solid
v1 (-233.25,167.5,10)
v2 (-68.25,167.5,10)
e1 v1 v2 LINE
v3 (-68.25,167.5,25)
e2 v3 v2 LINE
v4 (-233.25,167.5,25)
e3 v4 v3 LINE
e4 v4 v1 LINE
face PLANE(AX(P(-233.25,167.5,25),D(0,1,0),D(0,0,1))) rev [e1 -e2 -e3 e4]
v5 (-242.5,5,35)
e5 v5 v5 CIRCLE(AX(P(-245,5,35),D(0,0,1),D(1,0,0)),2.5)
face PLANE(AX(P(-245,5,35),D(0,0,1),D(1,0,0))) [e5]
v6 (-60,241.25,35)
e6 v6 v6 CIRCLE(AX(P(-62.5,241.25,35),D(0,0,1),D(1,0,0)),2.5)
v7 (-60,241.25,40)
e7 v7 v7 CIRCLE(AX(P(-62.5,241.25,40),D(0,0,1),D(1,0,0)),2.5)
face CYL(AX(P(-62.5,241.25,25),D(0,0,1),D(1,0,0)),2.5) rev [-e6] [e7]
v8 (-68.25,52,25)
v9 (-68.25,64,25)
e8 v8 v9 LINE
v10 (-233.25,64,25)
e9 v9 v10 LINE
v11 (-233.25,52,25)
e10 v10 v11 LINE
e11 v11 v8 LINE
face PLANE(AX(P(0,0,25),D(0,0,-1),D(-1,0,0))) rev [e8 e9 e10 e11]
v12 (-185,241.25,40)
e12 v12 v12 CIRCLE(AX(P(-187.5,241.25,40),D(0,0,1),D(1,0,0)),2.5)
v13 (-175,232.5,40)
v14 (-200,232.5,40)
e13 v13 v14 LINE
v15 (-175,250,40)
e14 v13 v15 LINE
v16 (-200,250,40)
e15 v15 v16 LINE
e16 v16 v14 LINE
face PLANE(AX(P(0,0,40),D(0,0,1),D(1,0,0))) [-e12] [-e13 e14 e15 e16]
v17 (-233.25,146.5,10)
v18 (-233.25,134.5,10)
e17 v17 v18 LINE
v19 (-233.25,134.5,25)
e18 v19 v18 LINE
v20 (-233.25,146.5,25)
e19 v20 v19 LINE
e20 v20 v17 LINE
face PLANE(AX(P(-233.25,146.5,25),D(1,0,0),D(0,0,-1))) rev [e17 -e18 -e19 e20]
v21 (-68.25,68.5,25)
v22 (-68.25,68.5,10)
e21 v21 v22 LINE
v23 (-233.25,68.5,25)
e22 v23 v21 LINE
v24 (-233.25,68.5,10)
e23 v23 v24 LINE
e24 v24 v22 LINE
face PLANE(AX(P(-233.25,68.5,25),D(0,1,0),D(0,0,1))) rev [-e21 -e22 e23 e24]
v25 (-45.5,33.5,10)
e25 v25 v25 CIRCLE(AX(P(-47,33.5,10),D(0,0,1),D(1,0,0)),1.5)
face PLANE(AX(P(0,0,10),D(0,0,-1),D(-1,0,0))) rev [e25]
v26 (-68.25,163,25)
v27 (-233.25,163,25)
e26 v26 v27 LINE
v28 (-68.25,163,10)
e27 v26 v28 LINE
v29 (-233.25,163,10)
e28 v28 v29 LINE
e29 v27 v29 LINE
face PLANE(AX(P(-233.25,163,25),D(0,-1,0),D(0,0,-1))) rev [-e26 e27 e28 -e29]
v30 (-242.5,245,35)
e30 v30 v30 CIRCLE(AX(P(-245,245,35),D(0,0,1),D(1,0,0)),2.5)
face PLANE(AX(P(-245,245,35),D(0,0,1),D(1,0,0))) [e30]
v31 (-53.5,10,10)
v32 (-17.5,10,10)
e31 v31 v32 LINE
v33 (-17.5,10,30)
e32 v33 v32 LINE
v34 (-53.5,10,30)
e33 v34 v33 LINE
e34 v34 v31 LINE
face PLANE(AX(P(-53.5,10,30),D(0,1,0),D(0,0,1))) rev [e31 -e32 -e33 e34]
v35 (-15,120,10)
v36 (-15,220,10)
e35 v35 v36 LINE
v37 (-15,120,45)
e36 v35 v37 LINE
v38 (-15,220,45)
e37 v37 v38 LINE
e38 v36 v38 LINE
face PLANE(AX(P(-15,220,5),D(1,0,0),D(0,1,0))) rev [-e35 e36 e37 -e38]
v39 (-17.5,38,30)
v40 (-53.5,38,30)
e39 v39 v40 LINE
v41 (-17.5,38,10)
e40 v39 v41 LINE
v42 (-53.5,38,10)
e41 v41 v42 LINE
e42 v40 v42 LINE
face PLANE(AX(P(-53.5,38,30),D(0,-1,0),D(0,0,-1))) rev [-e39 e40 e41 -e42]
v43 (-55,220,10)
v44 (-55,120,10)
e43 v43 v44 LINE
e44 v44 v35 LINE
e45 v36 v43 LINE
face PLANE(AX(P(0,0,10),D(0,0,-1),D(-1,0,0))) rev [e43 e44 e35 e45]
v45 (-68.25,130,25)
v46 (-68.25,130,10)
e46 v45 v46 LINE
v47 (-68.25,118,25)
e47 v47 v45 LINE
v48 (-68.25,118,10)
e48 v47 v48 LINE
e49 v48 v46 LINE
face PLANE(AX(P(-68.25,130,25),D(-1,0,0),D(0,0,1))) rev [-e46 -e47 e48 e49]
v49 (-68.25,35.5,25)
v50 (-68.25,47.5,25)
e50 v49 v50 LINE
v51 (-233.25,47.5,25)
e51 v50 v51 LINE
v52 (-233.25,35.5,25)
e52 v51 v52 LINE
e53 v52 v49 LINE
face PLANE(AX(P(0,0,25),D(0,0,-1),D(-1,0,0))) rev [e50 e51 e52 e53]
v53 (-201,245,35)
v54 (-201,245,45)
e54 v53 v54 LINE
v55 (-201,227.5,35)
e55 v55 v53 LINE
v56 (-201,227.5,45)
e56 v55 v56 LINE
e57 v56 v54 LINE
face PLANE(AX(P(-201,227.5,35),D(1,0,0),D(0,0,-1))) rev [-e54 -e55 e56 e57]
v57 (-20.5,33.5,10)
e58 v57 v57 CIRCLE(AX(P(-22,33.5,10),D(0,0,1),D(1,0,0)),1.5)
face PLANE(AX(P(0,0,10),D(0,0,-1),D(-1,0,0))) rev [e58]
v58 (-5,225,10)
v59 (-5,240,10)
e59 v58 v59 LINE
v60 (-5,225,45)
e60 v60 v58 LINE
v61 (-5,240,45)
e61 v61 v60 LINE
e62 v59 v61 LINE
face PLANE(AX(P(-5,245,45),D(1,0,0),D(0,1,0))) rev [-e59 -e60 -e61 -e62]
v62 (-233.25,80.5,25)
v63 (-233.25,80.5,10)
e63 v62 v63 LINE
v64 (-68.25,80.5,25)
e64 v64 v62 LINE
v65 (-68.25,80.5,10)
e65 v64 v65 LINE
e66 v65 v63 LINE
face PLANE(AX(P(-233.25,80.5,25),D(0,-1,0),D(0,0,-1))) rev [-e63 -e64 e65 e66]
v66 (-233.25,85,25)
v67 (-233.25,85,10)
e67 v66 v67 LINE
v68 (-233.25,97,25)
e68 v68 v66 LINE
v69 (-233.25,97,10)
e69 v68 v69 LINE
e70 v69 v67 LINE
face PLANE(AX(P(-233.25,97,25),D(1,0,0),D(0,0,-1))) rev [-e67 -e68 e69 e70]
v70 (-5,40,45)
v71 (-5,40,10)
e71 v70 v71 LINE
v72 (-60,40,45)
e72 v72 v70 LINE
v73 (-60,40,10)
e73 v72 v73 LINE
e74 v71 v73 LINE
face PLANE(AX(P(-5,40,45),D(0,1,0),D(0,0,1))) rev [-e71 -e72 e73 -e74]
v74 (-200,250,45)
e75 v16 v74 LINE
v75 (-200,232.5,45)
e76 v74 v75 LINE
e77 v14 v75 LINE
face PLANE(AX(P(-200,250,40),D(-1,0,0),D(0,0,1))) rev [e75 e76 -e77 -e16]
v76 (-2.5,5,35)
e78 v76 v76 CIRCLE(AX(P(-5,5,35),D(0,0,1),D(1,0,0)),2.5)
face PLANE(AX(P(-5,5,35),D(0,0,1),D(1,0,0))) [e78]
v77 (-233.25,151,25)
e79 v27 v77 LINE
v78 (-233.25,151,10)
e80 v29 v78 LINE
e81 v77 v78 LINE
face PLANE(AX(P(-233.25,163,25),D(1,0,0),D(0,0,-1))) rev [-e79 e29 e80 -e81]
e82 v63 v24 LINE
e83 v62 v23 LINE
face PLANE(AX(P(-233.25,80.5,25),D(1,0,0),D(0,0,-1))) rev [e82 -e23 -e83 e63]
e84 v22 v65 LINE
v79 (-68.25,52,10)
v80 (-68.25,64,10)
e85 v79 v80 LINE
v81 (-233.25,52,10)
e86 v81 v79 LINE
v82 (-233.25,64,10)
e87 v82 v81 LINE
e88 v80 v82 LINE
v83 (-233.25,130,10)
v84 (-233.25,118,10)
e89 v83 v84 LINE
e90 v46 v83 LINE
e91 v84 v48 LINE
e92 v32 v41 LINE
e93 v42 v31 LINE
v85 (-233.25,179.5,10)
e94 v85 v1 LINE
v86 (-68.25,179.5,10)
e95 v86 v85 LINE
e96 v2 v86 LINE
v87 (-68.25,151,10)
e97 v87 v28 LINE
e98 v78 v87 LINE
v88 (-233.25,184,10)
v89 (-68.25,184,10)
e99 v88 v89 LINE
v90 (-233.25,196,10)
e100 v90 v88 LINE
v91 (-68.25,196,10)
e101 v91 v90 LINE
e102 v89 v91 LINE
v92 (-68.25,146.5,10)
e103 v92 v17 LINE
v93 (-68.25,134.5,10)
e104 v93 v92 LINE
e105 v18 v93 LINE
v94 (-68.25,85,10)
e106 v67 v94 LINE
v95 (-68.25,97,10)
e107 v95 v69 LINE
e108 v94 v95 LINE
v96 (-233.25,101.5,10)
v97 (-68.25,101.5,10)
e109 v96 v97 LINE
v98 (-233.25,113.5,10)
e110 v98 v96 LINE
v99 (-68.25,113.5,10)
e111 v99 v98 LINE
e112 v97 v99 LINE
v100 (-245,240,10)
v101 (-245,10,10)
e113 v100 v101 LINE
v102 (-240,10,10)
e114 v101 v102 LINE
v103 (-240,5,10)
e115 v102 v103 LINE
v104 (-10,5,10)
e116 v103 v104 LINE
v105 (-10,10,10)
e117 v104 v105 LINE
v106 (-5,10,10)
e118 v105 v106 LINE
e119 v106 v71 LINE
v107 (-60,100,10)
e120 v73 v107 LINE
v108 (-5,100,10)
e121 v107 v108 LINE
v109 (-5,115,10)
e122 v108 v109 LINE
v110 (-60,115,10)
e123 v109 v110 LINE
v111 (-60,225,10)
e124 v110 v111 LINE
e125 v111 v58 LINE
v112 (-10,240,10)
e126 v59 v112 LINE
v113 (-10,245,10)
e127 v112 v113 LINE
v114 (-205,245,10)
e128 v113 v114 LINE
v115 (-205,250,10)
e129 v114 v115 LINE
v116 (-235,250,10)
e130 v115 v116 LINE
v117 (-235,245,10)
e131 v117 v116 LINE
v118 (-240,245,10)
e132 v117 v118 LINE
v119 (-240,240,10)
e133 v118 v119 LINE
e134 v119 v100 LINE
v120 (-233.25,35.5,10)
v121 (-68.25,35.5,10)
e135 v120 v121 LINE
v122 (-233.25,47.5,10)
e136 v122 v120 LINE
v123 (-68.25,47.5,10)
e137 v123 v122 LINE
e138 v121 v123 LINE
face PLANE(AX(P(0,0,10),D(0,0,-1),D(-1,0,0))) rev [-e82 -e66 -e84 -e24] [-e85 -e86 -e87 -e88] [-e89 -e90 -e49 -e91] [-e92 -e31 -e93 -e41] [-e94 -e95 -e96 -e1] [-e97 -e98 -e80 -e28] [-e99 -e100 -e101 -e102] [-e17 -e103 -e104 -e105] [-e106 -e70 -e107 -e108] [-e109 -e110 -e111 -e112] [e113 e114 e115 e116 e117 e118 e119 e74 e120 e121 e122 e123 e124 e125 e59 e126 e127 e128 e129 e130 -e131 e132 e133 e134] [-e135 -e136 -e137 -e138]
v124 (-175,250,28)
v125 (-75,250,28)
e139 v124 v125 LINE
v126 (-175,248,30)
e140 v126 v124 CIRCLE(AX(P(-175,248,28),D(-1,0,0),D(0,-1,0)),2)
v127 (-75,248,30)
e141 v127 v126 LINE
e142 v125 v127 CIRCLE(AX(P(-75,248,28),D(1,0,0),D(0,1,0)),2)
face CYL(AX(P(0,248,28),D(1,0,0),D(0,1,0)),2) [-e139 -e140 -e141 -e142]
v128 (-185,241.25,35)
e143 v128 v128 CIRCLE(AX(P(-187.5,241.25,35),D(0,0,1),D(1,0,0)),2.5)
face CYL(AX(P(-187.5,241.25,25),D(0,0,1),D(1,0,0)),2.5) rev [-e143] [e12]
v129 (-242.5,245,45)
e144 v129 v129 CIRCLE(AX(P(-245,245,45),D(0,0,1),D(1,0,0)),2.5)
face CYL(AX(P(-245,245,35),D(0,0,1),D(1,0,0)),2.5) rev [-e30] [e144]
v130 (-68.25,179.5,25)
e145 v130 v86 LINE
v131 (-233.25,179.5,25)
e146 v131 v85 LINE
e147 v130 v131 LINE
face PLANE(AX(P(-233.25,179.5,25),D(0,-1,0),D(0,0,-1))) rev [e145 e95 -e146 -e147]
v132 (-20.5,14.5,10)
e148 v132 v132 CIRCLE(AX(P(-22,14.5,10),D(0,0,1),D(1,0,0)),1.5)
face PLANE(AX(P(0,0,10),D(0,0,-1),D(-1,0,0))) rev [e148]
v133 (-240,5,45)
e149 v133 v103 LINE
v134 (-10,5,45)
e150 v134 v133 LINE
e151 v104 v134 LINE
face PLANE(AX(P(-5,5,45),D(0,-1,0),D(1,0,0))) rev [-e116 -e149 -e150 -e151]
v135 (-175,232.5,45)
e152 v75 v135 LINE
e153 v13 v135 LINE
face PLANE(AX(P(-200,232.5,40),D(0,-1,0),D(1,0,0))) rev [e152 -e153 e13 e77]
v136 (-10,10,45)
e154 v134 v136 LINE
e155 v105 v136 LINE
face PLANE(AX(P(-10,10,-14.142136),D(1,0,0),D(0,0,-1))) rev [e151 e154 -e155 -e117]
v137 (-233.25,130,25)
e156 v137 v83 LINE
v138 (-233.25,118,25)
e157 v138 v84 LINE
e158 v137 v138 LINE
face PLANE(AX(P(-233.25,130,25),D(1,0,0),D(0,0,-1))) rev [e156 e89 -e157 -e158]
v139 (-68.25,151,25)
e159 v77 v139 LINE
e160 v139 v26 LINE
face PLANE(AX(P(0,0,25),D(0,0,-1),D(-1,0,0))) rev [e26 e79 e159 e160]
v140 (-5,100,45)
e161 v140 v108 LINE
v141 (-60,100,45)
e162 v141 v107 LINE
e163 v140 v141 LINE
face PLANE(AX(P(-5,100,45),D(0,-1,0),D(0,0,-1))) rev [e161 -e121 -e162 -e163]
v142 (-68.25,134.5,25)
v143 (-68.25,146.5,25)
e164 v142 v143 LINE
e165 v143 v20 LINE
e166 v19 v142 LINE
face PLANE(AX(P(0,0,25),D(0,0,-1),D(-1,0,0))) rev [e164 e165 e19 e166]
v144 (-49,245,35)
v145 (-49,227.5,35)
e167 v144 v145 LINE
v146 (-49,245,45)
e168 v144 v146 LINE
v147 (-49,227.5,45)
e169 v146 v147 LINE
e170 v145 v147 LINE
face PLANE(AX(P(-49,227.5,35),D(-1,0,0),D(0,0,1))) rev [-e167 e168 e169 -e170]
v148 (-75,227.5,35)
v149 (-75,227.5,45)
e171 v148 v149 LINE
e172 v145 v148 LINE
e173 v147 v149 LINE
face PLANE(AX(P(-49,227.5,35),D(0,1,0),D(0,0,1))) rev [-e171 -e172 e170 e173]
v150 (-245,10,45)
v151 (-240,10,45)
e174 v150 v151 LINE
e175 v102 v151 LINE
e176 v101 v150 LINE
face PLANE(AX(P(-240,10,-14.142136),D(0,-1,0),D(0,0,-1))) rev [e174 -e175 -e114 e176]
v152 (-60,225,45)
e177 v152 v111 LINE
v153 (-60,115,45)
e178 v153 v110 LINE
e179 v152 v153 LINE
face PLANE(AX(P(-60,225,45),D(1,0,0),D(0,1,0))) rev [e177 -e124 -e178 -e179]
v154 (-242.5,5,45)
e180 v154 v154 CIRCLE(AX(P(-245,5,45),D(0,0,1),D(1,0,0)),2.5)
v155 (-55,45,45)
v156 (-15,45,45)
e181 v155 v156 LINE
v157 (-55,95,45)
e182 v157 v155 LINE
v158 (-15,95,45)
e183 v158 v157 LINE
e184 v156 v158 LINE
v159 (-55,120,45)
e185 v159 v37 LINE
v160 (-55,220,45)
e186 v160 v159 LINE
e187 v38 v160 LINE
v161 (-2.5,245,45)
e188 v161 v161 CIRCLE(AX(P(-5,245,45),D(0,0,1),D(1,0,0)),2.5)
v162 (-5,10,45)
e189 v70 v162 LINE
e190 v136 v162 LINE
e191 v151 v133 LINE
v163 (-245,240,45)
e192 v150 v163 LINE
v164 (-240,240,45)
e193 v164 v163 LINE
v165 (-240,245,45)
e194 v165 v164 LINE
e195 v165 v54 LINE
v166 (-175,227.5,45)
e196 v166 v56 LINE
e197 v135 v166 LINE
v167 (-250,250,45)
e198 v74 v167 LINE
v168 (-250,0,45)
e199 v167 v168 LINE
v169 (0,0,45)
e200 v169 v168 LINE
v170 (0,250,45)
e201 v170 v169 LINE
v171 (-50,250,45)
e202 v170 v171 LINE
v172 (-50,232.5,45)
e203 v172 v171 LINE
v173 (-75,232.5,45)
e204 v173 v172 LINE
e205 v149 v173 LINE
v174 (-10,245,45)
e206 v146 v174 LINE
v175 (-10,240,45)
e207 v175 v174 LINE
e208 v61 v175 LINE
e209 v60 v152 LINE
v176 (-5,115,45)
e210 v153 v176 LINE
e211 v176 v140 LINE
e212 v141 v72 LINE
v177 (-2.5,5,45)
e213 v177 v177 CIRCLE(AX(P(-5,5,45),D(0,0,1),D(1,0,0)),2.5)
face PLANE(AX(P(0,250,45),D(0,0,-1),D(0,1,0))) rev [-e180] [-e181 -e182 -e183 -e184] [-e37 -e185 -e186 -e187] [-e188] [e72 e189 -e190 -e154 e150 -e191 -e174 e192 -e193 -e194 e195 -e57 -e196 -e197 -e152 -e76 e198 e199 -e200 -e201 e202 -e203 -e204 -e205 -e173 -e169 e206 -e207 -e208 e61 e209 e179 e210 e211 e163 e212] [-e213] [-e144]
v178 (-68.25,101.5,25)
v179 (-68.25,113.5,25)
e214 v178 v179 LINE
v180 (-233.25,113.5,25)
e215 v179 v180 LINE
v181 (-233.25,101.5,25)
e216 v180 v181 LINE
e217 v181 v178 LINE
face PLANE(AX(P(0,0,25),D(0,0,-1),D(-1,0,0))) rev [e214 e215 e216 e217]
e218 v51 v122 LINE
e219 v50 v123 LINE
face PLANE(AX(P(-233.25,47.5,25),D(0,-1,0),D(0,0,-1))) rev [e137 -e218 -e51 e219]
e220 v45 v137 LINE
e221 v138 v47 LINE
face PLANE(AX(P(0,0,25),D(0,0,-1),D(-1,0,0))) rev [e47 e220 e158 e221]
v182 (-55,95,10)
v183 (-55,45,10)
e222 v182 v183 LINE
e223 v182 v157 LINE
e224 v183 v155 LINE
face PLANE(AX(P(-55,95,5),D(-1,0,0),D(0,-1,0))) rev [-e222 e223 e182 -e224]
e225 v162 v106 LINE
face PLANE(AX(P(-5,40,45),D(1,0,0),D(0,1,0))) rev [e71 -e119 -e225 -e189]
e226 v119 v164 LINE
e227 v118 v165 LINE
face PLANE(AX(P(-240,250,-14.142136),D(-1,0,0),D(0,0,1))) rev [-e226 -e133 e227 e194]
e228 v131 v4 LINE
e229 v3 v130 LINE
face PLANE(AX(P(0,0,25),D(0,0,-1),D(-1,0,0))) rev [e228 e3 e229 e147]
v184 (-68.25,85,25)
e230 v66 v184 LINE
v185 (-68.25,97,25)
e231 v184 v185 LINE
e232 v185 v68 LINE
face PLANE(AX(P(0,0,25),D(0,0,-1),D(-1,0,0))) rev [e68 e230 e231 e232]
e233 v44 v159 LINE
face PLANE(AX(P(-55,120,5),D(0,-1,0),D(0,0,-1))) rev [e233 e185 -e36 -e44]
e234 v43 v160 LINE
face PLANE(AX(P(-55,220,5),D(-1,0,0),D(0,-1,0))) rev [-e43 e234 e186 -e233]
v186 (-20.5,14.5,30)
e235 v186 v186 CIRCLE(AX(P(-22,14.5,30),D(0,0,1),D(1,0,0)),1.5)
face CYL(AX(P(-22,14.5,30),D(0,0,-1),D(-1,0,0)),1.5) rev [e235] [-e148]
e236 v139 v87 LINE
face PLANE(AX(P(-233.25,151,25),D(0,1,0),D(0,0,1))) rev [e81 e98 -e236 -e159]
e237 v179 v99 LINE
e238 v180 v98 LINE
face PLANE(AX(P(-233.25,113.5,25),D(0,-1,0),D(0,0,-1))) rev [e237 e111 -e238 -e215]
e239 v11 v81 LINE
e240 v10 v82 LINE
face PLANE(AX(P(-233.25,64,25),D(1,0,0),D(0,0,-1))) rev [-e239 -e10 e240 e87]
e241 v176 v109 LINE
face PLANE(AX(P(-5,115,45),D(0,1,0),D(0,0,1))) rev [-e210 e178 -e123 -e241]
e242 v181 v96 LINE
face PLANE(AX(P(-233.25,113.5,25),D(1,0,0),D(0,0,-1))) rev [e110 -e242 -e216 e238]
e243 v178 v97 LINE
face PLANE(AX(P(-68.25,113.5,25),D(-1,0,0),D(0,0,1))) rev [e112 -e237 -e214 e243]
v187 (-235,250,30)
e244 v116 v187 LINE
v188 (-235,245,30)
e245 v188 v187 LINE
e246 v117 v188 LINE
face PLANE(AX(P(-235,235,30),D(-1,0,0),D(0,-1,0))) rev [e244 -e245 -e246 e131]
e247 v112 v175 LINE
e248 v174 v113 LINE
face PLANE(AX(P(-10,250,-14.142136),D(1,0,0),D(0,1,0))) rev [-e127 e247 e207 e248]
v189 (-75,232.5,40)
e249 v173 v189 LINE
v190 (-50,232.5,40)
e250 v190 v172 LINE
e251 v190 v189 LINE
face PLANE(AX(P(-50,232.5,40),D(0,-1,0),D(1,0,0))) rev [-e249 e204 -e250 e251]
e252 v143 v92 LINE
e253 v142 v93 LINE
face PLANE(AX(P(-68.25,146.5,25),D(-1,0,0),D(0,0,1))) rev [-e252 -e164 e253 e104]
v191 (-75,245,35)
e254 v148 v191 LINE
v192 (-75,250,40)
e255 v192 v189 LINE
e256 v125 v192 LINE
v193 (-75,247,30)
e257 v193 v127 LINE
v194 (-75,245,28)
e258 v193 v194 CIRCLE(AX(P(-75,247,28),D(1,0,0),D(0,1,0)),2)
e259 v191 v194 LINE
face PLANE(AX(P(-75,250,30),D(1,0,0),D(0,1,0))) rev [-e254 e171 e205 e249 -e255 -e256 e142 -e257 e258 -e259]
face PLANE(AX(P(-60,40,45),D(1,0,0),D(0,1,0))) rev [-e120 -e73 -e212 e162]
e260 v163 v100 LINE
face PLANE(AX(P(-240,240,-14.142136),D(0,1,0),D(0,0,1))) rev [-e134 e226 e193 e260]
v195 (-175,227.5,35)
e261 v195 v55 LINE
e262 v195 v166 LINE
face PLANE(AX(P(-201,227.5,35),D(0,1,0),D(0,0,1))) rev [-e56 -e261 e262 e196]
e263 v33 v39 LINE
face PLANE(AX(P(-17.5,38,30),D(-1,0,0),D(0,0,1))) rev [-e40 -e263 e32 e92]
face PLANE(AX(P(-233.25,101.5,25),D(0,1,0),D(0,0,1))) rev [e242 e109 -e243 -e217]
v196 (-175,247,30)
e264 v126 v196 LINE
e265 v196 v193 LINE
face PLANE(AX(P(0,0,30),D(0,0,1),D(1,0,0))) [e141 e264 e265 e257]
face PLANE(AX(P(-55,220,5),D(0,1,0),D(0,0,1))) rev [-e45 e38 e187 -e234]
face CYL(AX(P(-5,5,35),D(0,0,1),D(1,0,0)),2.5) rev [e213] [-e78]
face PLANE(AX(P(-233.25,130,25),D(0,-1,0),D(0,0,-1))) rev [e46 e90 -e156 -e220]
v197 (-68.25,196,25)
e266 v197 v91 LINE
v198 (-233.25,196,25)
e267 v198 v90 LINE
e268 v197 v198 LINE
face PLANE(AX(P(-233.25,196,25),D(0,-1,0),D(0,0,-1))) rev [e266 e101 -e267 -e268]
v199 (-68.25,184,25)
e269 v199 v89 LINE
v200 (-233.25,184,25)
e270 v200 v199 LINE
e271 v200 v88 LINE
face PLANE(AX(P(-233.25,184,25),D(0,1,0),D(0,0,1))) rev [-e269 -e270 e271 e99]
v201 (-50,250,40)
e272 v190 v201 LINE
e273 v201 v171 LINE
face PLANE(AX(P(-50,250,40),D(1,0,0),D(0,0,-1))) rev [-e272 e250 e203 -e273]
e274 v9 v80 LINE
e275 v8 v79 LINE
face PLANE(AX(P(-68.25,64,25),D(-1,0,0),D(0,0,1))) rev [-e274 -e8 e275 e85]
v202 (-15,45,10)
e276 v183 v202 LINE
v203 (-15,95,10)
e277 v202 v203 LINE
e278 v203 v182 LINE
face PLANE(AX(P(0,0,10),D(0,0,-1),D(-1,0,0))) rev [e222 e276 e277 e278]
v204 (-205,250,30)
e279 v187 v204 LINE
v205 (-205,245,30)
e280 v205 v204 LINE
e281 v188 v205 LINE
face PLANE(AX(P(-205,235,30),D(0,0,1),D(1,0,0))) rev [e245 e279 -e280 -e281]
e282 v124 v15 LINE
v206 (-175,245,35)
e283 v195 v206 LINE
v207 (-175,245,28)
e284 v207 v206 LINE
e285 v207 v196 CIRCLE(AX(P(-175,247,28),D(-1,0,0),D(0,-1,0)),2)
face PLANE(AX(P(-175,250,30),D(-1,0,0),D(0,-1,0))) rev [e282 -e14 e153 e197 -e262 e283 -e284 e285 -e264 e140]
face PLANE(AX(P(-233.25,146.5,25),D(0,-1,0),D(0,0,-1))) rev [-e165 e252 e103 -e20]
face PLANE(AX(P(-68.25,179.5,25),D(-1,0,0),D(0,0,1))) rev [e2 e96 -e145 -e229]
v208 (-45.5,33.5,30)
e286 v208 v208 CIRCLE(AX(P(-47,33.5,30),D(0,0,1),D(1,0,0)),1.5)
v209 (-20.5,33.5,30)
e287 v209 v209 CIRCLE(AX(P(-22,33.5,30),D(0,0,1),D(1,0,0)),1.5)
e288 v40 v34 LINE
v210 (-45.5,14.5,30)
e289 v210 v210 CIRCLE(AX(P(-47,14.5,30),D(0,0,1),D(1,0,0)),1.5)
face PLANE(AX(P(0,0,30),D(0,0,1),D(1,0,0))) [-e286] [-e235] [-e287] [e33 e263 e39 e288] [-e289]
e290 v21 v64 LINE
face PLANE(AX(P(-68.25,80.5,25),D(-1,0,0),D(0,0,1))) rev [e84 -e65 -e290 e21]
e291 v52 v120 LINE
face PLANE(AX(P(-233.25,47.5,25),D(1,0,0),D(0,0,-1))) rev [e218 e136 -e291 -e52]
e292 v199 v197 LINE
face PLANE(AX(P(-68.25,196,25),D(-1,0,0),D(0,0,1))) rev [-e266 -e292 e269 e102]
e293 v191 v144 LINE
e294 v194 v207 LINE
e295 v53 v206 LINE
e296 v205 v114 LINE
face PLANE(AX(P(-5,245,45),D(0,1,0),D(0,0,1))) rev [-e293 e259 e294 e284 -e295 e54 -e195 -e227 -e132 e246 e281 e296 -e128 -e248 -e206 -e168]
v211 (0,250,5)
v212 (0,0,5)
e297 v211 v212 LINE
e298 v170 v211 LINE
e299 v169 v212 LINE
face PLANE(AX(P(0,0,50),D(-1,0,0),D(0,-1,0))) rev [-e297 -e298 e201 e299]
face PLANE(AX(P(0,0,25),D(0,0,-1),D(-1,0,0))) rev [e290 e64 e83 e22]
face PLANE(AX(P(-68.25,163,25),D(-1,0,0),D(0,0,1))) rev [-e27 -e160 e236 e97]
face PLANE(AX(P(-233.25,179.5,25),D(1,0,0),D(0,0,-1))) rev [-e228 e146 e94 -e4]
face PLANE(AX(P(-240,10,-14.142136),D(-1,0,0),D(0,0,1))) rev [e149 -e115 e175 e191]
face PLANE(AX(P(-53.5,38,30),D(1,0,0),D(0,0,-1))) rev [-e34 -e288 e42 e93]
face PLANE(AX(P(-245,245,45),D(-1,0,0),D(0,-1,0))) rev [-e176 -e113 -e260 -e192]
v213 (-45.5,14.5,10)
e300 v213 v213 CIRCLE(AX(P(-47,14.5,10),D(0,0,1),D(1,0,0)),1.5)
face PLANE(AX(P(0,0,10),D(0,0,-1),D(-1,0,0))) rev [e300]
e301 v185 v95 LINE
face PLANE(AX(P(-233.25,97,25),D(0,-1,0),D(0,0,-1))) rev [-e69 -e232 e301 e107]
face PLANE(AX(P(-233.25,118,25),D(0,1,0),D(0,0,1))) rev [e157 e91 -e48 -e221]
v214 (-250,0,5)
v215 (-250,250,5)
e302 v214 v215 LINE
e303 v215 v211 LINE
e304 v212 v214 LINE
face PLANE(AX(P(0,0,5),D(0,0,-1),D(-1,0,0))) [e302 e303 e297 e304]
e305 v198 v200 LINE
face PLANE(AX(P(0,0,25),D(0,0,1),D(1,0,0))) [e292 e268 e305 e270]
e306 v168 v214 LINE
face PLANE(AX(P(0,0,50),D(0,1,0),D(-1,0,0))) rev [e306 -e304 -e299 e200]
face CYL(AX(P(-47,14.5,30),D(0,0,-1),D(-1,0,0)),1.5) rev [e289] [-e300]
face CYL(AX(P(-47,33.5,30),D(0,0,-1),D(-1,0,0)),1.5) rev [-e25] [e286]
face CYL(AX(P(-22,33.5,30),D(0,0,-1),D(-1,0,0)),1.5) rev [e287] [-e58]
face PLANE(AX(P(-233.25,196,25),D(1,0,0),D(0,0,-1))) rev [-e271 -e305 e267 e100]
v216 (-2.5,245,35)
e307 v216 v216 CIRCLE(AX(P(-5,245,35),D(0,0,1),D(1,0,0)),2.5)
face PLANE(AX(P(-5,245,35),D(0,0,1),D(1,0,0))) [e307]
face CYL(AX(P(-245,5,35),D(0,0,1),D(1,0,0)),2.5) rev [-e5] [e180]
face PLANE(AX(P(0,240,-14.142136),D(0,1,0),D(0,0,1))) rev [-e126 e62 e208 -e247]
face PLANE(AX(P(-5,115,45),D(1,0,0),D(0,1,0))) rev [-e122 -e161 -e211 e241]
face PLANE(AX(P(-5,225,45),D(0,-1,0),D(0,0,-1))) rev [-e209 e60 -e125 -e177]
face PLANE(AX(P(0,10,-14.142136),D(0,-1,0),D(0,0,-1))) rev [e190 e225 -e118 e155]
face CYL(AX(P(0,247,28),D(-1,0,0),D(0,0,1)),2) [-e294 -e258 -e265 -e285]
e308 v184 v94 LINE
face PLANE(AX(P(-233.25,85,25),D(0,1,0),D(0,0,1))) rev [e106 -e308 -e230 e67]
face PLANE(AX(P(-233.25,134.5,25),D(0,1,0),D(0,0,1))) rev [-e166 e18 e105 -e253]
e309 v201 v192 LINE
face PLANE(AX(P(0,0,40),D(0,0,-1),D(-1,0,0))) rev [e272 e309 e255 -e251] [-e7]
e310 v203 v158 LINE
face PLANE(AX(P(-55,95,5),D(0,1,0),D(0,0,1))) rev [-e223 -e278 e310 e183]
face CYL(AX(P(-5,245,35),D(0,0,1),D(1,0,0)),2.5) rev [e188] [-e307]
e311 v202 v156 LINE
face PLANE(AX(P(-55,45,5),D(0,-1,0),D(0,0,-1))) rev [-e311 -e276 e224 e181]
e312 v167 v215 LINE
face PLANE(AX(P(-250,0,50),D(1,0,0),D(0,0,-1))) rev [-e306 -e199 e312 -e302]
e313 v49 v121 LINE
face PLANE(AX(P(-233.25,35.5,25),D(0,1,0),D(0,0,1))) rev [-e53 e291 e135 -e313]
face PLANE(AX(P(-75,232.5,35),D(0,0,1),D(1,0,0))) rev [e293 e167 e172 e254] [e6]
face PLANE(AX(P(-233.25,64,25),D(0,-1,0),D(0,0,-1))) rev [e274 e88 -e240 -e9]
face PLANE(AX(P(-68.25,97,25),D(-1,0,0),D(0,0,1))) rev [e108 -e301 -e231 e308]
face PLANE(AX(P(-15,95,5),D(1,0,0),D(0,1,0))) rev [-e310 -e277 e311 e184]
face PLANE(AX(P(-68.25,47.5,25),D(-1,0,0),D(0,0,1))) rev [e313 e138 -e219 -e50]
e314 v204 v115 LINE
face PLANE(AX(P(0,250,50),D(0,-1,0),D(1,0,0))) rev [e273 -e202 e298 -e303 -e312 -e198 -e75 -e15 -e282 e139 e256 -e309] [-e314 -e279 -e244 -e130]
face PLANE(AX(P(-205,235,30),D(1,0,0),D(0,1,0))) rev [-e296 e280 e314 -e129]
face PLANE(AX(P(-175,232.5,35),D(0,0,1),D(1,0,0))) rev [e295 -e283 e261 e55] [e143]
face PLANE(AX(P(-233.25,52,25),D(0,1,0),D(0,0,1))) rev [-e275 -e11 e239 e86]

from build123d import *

# Parameters (mm, degrees)
SKETCH1_W                        = 250
SKETCH1_H                        = 250
BOSS_EXTRUDE1_DEPTH              = 50
SKETCH2_W                        = 40
SKETCH2_H                        = 100
SKETCH2_H_2                      = 50
CUT_EXTRUDE1_DEPTH               = 45
FILLET1_R                        = 5
FILLET2_R                        = 5
SKETCH5_R                        = 6.25
CUT_EXTRUDE2_DEPTH               = 22
FILLET5_R                        = 1.5
LPATTERN4_COUNT                  = 10
LPATTERN4_PITCH                  = 16.5
LPATTERN4_COUNT_DIR2             = 10
LPATTERN4_PITCH_DIR2             = 16.5
FILLET5_OF_LPATTERN4_R           = 1.5
CUT_EXTRUDE4_DEPTH               = 45
SKETCH8_W                        = 100
SKETCH8_H                        = 20
CUT_EXTRUDE5_DEPTH               = 20
FILLET6_R                        = 2.5
FILLET7_R                        = 2
SKETCH10_R                       = 13.5
CUT_EXTRUDE6_DEPTH               = 358.071421427
SKETCH4_W                        = 25
SKETCH4_H                        = 17.5
CUT_EXTRUDE7_DEPTH               = 10
VERRUNDUNG1_R                    = 2.5
SKIZZE2_W                        = 25
SKIZZE2_H                        = 5
AUFSATZ_LINEAR_AUSTRAGEN1_DEPTH  = 12.5
AUFSATZ_LINEAR_AUSTRAGEN2_DEPTH  = 10
SKIZZE11_W                       = 164
SKIZZE11_H                       = 164
SCHNITT_LINEAR_AUSTRAGEN6_DEPTH  = 10
SKIZZE12_W                       = 174
SKIZZE12_H                       = 174
SCHNITT_LINEAR_AUSTRAGEN7_DEPTH  = 2.5
SKIZZE13_R                       = 1.5
SCHNITT_LINEAR_AUSTRAGEN8_DEPTH  = 2.5
SKIZZE14_W                       = 10
SKIZZE14_H                       = 10
AUFSATZ_LINEAR_AUSTRAGEN3_DEPTH  = 45
SKIZZE16_W                       = 5
SKIZZE16_H                       = 250
SCHNITT_LINEAR_AUSTRAGEN9_DEPTH  = 358.071421427
SKIZZE18_R                       = 2.5
SCHNITT_LINEAR_AUSTRAGEN10_DEPTH = 10
SKIZZE21_W                       = 250
SKIZZE21_H                       = 250
SCHNITT_LINEAR_AUSTRAGEN13_DEPTH = 10
SKIZZE25_W                       = 250
SKIZZE25_H                       = 250
AUFSATZ_LINEAR_AUSTRAGEN7_DEPTH  = 5
SKIZZE26_W                       = 36
SKIZZE26_H                       = 28
SKIZZE26_R                       = 1.5
AUFSATZ_LINEAR_AUSTRAGEN8_DEPTH  = 20
SKIZZE27_W                       = 165
SKIZZE27_H                       = 12
AUFSATZ_LINEAR_AUSTRAGEN9_DEPTH  = 15
SKIZZE28_W                       = 30
SKIZZE28_H                       = 20
SCHNITT_LINEAR_AUSTRAGEN14_DEPTH = 15
SKIZZE29_R                       = 2.5
SCHNITT_LINEAR_AUSTRAGEN15_DEPTH = 15


with BuildPart() as part:
    # Sketch1 → Boss-Extrude1 (new body)
    with BuildSketch(Plane.XY):
        with Locations((-125, 125)):
            Rectangle(SKETCH1_W, SKETCH1_H)
    extrude(amount=BOSS_EXTRUDE1_DEPTH)

    # Sketch2 → Cut-Extrude1 (cut)
    with BuildSketch(Plane.XY.offset(50)):
        with Locations((-35, 170)):
            Rectangle(SKETCH2_W, SKETCH2_H)
        with Locations((-35, 70)):
            Rectangle(SKETCH2_W, SKETCH2_H_2)
    extrude(amount=-CUT_EXTRUDE1_DEPTH, mode=Mode.SUBTRACT)

    # Fillet1
    fillet1_edges = [part.edges().sort_by_distance(p)[0] for p in [
        (-55, 170, 50),
        (-35, 120, 50),
        (-15, 170, 50),
        (-35, 220, 50),
    ]]
    fillet(fillet1_edges, radius=FILLET1_R)

    # Fillet2
    fillet2_edges = [part.edges().sort_by_distance(p)[0] for p in [
        (-55, 70, 50),
        (-35, 45, 50),
        (-15, 70, 50),
        (-35, 95, 50),
    ]]
    fillet(fillet2_edges, radius=FILLET2_R)

    # Sketch5 → Cut-Extrude2 (cut)
    with BuildSketch(Plane.XY.offset(50)):
        with Locations((-225, 190)):
            Circle(SKETCH5_R)
    cut_extrude2 = extrude(amount=-CUT_EXTRUDE2_DEPTH, mode=Mode.SUBTRACT)

    # Fillet5
    fillet5_edges = [part.edges().sort_by_distance(p)[0] for p in [
        (-231.25, 190, 50),
    ]]
    fillet(fillet5_edges, radius=FILLET5_R)

    # LPattern4: Cut-Extrude2 10 × 10
    with Locations(*[(i * LPATTERN4_PITCH, -j * LPATTERN4_PITCH_DIR2, 0) for i in range(LPATTERN4_COUNT) for j in range(LPATTERN4_COUNT_DIR2) if (i, j) != (0, 0)]):
        add(cut_extrude2, mode=Mode.SUBTRACT)

    # Fillet5 of LPattern4
    fillet5_of_lpattern4_edges = [part.edges().sort_by_distance(p)[0] for p in [
        (-231.25, 173.5, 50),
        (-231.25, 157, 50),
        (-231.25, 140.5, 50),
        (-231.25, 124, 50),
        (-231.25, 107.5, 50),
        (-231.25, 91, 50),
        (-231.25, 74.5, 50),
        (-231.25, 58, 50),
        (-231.25, 41.5, 50),
        (-214.75, 190, 50),
        (-214.75, 173.5, 50),
        (-214.75, 157, 50),
        (-214.75, 140.5, 50),
        (-214.75, 124, 50),
        (-214.75, 107.5, 50),
        (-214.75, 91, 50),
        (-214.75, 74.5, 50),
        (-214.75, 58, 50),
        (-214.75, 41.5, 50),
        (-198.25, 190, 50),
        (-198.25, 173.5, 50),
        (-198.25, 157, 50),
        (-198.25, 140.5, 50),
        (-198.25, 124, 50),
        (-198.25, 107.5, 50),
        (-198.25, 91, 50),
        (-198.25, 74.5, 50),
        (-198.25, 58, 50),
        (-198.25, 41.5, 50),
        (-181.75, 190, 50),
        (-181.75, 173.5, 50),
        (-181.75, 157, 50),
        (-181.75, 140.5, 50),
        (-181.75, 124, 50),
        (-181.75, 107.5, 50),
        (-181.75, 91, 50),
        (-181.75, 74.5, 50),
        (-181.75, 58, 50),
        (-181.75, 41.5, 50),
        (-165.25, 190, 50),
        (-165.25, 173.5, 50),
        (-165.25, 157, 50),
        (-165.25, 140.5, 50),
        (-165.25, 124, 50),
        (-165.25, 107.5, 50),
        (-165.25, 91, 50),
        (-165.25, 74.5, 50),
        (-165.25, 58, 50),
        (-165.25, 41.5, 50),
        (-148.75, 190, 50),
        (-148.75, 173.5, 50),
        (-148.75, 157, 50),
        (-148.75, 140.5, 50),
        (-148.75, 124, 50),
        (-148.75, 107.5, 50),
        (-148.75, 91, 50),
        (-148.75, 74.5, 50),
        (-148.75, 58, 50),
        (-148.75, 41.5, 50),
        (-132.25, 190, 50),
        (-132.25, 173.5, 50),
        (-132.25, 157, 50),
        (-132.25, 140.5, 50),
        (-132.25, 124, 50),
        (-132.25, 107.5, 50),
        (-132.25, 91, 50),
        (-132.25, 74.5, 50),
        (-132.25, 58, 50),
        (-132.25, 41.5, 50),
        (-115.75, 190, 50),
        (-115.75, 173.5, 50),
        (-115.75, 157, 50),
        (-115.75, 140.5, 50),
        (-115.75, 124, 50),
        (-115.75, 107.5, 50),
        (-115.75, 91, 50),
        (-115.75, 74.5, 50),
        (-115.75, 58, 50),
        (-115.75, 41.5, 50),
        (-99.25, 190, 50),
        (-99.25, 173.5, 50),
        (-99.25, 157, 50),
        (-99.25, 140.5, 50),
        (-99.25, 124, 50),
        (-99.25, 107.5, 50),
        (-99.25, 91, 50),
        (-99.25, 74.5, 50),
        (-99.25, 58, 50),
        (-99.25, 41.5, 50),
        (-82.75, 190, 50),
        (-82.75, 173.5, 50),
        (-82.75, 157, 50),
        (-82.75, 140.5, 50),
        (-82.75, 124, 50),
        (-82.75, 107.5, 50),
        (-82.75, 91, 50),
        (-82.75, 74.5, 50),
        (-82.75, 58, 50),
        (-82.75, 41.5, 50),
    ]]
    fillet(fillet5_of_lpattern4_edges, radius=FILLET5_OF_LPATTERN4_R)

    # Sketch7 → Cut-Extrude4 (cut)
    with BuildSketch(Plane(origin=(0, 0, 0), x_dir=(-1, 0, 0), z_dir=(0, 0, -1))):
        Polygon((5, 245), (245, 245), (245, 5), (5, 5), (5, 40), (60, 40), (60, 100), (5, 100), (5, 115), (60, 115), (60, 225), (5, 225), align=None)
    extrude(amount=-CUT_EXTRUDE4_DEPTH, mode=Mode.SUBTRACT)

    # Sketch8 → Cut-Extrude5 (cut)
    with BuildSketch(Plane.XY.offset(50)):
        with Locations((-125, 240)):
            Rectangle(SKETCH8_W, SKETCH8_H)
    extrude(amount=-CUT_EXTRUDE5_DEPTH, mode=Mode.SUBTRACT)

    # Fillet6
    fillet6_edges = [part.edges().sort_by_distance(p)[0] for p in [
        (-125, 230, 45),
        (-125, 230, 50),
    ]]
    fillet(fillet6_edges, radius=FILLET6_R - 0.0001)  # a hair under: the kernel refuses the full size

    # Fillet7
    fillet7_edges = [part.edges().sort_by_distance(p)[0] for p in [
        (-125, 245, 30),
        (-125, 250, 30),
    ]]
    fillet(fillet7_edges, radius=FILLET7_R)

    # Sketch10 → Cut-Extrude6 (cut, through all)
    with BuildSketch(Plane.XY.offset(50)):
        with Locations((-35, 20)):
            Circle(SKETCH10_R)
    extrude(amount=-CUT_EXTRUDE6_DEPTH, mode=Mode.SUBTRACT)

    # Sketch4 → Cut-Extrude7 (cut)
    with BuildSketch(Plane.XY.offset(50)):
        with Locations((-187.5, 241.25)):
            Rectangle(SKETCH4_W, SKETCH4_H)
        with Locations((-62.5, 241.25)):
            Rectangle(SKETCH4_W, SKETCH4_H)
    extrude(amount=-CUT_EXTRUDE7_DEPTH, mode=Mode.SUBTRACT)

    # Verrundung1
    verrundung1_edges = [part.edges().sort_by_distance(p)[0] for p in [
        (-48.5, 20, 45),
        (-48.5, 20, 50),
    ]]
    fillet(verrundung1_edges, radius=VERRUNDUNG1_R - 0.0001)  # a hair under: the kernel refuses the full size

    # Skizze2 → Aufsatz-Linear austragen1 (add)
    with BuildSketch(Plane.XZ.offset(-245)):
        with Locations((-187.5, 37.5)):
            Rectangle(SKIZZE2_W, SKIZZE2_H)
        with Locations((-62.5, 37.5)):
            Rectangle(SKIZZE2_W, SKIZZE2_H)
    extrude(amount=AUFSATZ_LINEAR_AUSTRAGEN1_DEPTH)

    # Skizze4 → Aufsatz-Linear austragen2 (add)
    with BuildSketch(Plane(origin=(0, 0, 45), x_dir=(-1, 0, 0), z_dir=(0, 0, -1))):
        Polygon((50, 232.5), (75, 232.5), (75, 227.5), (49, 227.5), (49, 245), (50, 245), align=None)
        Polygon((200, 232.5), (175, 232.5), (175, 227.5), (201, 227.5), (201, 245), (200, 245), align=None)
    extrude(amount=AUFSATZ_LINEAR_AUSTRAGEN2_DEPTH)

    # Skizze11 → Schnitt-Linear austragen6 (cut)
    with BuildSketch(Plane.XY.offset(50)):
        with Locations((-150.75, 115.75)):
            Rectangle(SKIZZE11_W, SKIZZE11_H)
    extrude(amount=-SCHNITT_LINEAR_AUSTRAGEN6_DEPTH, mode=Mode.SUBTRACT)

    # Skizze12 → Schnitt-Linear austragen7 (cut)
    with BuildSketch(Plane.XY.offset(50)):
        with Locations((-150.75, 115.75)):
            Rectangle(SKIZZE12_W, SKIZZE12_H)
    extrude(amount=-SCHNITT_LINEAR_AUSTRAGEN7_DEPTH, mode=Mode.SUBTRACT)

    # Skizze13 → Schnitt-Linear austragen8 (cut)
    with BuildSketch(Plane.XY.offset(47.5)):
        with Locations((-235.25, 200.25)):
            Circle(SKIZZE13_R)
        with Locations((-150.75, 200.25)):
            Circle(SKIZZE13_R)
        with Locations((-66.25, 200.25)):
            Circle(SKIZZE13_R)
        with Locations((-235.25, 115.75)):
            Circle(SKIZZE13_R)
        with Locations((-66.25, 115.75)):
            Circle(SKIZZE13_R)
        with Locations(Location((-66.25, 31.25, 0), (0, 0, 180))):
            Circle(SKIZZE13_R)
        with Locations(Location((-150.75, 31.25, 0), (0, 0, 180))):
            Circle(SKIZZE13_R)
        with Locations(Location((-235.25, 31.25, 0), (0, 0, 180))):
            Circle(SKIZZE13_R)
    extrude(amount=-SCHNITT_LINEAR_AUSTRAGEN8_DEPTH, mode=Mode.SUBTRACT)

    # Skizze14 → Aufsatz-Linear austragen3 (add)
    with BuildSketch(Plane(origin=(0, 0, 45), x_dir=(-1, 0, 0), z_dir=(0, 0, -1))):
        with Locations((5, 245)):
            Rectangle(SKIZZE14_W, SKIZZE14_H)
        with Locations((245, 245)):
            Rectangle(SKIZZE14_W, SKIZZE14_H)
        with Locations((245, 5)):
            Rectangle(SKIZZE14_W, SKIZZE14_H)
        with Locations((5, 5)):
            Rectangle(SKIZZE14_W, SKIZZE14_H)
    extrude(amount=AUFSATZ_LINEAR_AUSTRAGEN3_DEPTH)

    # Skizze16 → Schnitt-Linear austragen9 (cut, through all)
    with BuildSketch(Plane.ZY.offset(250)):
        with Locations((47.5, 125)):
            Rectangle(SKIZZE16_W, SKIZZE16_H)
    extrude(amount=-SCHNITT_LINEAR_AUSTRAGEN9_DEPTH, mode=Mode.SUBTRACT)

    # Skizze18 → Schnitt-Linear austragen10 (cut)
    with BuildSketch(Plane.XY.offset(45)):
        with Locations((-245, 245)):
            Circle(SKIZZE18_R)
        with Locations((-5, 245)):
            Circle(SKIZZE18_R)
        with Locations((-5, 5)):
            Circle(SKIZZE18_R)
        with Locations((-245, 5)):
            Circle(SKIZZE18_R)
    extrude(amount=-SCHNITT_LINEAR_AUSTRAGEN10_DEPTH, mode=Mode.SUBTRACT)

    # Skizze21 → Schnitt-Linear austragen13 (cut)
    with BuildSketch(Plane(origin=(0, 0, 0), x_dir=(-1, 0, 0), z_dir=(0, 0, -1))):
        with Locations((125, 125)):
            Rectangle(SKIZZE21_W, SKIZZE21_H)
    extrude(amount=-SCHNITT_LINEAR_AUSTRAGEN13_DEPTH, mode=Mode.SUBTRACT)

    # Skizze25 → Aufsatz-Linear austragen7 (add)
    with BuildSketch(Plane(origin=(0, 0, 10), x_dir=(-1, 0, 0), z_dir=(0, 0, -1))):
        with Locations((125, 125)):
            Rectangle(SKIZZE25_W, SKIZZE25_H)
    extrude(amount=AUFSATZ_LINEAR_AUSTRAGEN7_DEPTH)

    # Skizze26 → Aufsatz-Linear austragen8 (add)
    with BuildSketch(Plane.XY.offset(10)):
        with Locations((-35.5, 24)):
            Rectangle(SKIZZE26_W, SKIZZE26_H)
        with Locations((-47, 33.5)):
            Circle(SKIZZE26_R, mode=Mode.SUBTRACT)
        with Locations((-22, 14.5)):
            Circle(SKIZZE26_R, mode=Mode.SUBTRACT)
        with Locations((-47, 14.5)):
            Circle(SKIZZE26_R, mode=Mode.SUBTRACT)
        with Locations((-22, 33.5)):
            Circle(SKIZZE26_R, mode=Mode.SUBTRACT)
    extrude(amount=AUFSATZ_LINEAR_AUSTRAGEN8_DEPTH)

    # Skizze27 → Aufsatz-Linear austragen9 (add)
    with BuildSketch(Plane.XY.offset(10)):
        with Locations((-150.75, 173.5)):
            Rectangle(SKIZZE27_W, SKIZZE27_H)
        with Locations((-150.75, 190)):
            Rectangle(SKIZZE27_W, SKIZZE27_H)
        with Locations((-150.75, 157)):
            Rectangle(SKIZZE27_W, SKIZZE27_H)
        with Locations((-150.75, 140.5)):
            Rectangle(SKIZZE27_W, SKIZZE27_H)
        with Locations((-150.75, 124)):
            Rectangle(SKIZZE27_W, SKIZZE27_H)
        with Locations((-150.75, 107.5)):
            Rectangle(SKIZZE27_W, SKIZZE27_H)
        with Locations((-150.75, 91)):
            Rectangle(SKIZZE27_W, SKIZZE27_H)
        with Locations((-150.75, 74.5)):
            Rectangle(SKIZZE27_W, SKIZZE27_H)
        with Locations((-150.75, 58)):
            Rectangle(SKIZZE27_W, SKIZZE27_H)
        with Locations((-150.75, 41.5)):
            Rectangle(SKIZZE27_W, SKIZZE27_H)
    extrude(amount=AUFSATZ_LINEAR_AUSTRAGEN9_DEPTH)

    # Skizze28 → Schnitt-Linear austragen14 (cut)
    with BuildSketch(Plane(origin=(0, 250, 0), x_dir=(1, 0, 0), z_dir=(0, 1, 0))):
        with Locations((-220, -20)):
            Rectangle(SKIZZE28_W, SKIZZE28_H)
    extrude(amount=-SCHNITT_LINEAR_AUSTRAGEN14_DEPTH, mode=Mode.SUBTRACT)

    # Skizze29 → Schnitt-Linear austragen15 (cut)
    with BuildSketch(Plane.XY.offset(40)):
        with Locations((-187.5, 241.25)):
            Circle(SKIZZE29_R)
        with Locations((-62.5, 241.25)):
            Circle(SKIZZE29_R)
    extrude(amount=-SCHNITT_LINEAR_AUSTRAGEN15_DEPTH, mode=Mode.SUBTRACT)


solid = part.part
